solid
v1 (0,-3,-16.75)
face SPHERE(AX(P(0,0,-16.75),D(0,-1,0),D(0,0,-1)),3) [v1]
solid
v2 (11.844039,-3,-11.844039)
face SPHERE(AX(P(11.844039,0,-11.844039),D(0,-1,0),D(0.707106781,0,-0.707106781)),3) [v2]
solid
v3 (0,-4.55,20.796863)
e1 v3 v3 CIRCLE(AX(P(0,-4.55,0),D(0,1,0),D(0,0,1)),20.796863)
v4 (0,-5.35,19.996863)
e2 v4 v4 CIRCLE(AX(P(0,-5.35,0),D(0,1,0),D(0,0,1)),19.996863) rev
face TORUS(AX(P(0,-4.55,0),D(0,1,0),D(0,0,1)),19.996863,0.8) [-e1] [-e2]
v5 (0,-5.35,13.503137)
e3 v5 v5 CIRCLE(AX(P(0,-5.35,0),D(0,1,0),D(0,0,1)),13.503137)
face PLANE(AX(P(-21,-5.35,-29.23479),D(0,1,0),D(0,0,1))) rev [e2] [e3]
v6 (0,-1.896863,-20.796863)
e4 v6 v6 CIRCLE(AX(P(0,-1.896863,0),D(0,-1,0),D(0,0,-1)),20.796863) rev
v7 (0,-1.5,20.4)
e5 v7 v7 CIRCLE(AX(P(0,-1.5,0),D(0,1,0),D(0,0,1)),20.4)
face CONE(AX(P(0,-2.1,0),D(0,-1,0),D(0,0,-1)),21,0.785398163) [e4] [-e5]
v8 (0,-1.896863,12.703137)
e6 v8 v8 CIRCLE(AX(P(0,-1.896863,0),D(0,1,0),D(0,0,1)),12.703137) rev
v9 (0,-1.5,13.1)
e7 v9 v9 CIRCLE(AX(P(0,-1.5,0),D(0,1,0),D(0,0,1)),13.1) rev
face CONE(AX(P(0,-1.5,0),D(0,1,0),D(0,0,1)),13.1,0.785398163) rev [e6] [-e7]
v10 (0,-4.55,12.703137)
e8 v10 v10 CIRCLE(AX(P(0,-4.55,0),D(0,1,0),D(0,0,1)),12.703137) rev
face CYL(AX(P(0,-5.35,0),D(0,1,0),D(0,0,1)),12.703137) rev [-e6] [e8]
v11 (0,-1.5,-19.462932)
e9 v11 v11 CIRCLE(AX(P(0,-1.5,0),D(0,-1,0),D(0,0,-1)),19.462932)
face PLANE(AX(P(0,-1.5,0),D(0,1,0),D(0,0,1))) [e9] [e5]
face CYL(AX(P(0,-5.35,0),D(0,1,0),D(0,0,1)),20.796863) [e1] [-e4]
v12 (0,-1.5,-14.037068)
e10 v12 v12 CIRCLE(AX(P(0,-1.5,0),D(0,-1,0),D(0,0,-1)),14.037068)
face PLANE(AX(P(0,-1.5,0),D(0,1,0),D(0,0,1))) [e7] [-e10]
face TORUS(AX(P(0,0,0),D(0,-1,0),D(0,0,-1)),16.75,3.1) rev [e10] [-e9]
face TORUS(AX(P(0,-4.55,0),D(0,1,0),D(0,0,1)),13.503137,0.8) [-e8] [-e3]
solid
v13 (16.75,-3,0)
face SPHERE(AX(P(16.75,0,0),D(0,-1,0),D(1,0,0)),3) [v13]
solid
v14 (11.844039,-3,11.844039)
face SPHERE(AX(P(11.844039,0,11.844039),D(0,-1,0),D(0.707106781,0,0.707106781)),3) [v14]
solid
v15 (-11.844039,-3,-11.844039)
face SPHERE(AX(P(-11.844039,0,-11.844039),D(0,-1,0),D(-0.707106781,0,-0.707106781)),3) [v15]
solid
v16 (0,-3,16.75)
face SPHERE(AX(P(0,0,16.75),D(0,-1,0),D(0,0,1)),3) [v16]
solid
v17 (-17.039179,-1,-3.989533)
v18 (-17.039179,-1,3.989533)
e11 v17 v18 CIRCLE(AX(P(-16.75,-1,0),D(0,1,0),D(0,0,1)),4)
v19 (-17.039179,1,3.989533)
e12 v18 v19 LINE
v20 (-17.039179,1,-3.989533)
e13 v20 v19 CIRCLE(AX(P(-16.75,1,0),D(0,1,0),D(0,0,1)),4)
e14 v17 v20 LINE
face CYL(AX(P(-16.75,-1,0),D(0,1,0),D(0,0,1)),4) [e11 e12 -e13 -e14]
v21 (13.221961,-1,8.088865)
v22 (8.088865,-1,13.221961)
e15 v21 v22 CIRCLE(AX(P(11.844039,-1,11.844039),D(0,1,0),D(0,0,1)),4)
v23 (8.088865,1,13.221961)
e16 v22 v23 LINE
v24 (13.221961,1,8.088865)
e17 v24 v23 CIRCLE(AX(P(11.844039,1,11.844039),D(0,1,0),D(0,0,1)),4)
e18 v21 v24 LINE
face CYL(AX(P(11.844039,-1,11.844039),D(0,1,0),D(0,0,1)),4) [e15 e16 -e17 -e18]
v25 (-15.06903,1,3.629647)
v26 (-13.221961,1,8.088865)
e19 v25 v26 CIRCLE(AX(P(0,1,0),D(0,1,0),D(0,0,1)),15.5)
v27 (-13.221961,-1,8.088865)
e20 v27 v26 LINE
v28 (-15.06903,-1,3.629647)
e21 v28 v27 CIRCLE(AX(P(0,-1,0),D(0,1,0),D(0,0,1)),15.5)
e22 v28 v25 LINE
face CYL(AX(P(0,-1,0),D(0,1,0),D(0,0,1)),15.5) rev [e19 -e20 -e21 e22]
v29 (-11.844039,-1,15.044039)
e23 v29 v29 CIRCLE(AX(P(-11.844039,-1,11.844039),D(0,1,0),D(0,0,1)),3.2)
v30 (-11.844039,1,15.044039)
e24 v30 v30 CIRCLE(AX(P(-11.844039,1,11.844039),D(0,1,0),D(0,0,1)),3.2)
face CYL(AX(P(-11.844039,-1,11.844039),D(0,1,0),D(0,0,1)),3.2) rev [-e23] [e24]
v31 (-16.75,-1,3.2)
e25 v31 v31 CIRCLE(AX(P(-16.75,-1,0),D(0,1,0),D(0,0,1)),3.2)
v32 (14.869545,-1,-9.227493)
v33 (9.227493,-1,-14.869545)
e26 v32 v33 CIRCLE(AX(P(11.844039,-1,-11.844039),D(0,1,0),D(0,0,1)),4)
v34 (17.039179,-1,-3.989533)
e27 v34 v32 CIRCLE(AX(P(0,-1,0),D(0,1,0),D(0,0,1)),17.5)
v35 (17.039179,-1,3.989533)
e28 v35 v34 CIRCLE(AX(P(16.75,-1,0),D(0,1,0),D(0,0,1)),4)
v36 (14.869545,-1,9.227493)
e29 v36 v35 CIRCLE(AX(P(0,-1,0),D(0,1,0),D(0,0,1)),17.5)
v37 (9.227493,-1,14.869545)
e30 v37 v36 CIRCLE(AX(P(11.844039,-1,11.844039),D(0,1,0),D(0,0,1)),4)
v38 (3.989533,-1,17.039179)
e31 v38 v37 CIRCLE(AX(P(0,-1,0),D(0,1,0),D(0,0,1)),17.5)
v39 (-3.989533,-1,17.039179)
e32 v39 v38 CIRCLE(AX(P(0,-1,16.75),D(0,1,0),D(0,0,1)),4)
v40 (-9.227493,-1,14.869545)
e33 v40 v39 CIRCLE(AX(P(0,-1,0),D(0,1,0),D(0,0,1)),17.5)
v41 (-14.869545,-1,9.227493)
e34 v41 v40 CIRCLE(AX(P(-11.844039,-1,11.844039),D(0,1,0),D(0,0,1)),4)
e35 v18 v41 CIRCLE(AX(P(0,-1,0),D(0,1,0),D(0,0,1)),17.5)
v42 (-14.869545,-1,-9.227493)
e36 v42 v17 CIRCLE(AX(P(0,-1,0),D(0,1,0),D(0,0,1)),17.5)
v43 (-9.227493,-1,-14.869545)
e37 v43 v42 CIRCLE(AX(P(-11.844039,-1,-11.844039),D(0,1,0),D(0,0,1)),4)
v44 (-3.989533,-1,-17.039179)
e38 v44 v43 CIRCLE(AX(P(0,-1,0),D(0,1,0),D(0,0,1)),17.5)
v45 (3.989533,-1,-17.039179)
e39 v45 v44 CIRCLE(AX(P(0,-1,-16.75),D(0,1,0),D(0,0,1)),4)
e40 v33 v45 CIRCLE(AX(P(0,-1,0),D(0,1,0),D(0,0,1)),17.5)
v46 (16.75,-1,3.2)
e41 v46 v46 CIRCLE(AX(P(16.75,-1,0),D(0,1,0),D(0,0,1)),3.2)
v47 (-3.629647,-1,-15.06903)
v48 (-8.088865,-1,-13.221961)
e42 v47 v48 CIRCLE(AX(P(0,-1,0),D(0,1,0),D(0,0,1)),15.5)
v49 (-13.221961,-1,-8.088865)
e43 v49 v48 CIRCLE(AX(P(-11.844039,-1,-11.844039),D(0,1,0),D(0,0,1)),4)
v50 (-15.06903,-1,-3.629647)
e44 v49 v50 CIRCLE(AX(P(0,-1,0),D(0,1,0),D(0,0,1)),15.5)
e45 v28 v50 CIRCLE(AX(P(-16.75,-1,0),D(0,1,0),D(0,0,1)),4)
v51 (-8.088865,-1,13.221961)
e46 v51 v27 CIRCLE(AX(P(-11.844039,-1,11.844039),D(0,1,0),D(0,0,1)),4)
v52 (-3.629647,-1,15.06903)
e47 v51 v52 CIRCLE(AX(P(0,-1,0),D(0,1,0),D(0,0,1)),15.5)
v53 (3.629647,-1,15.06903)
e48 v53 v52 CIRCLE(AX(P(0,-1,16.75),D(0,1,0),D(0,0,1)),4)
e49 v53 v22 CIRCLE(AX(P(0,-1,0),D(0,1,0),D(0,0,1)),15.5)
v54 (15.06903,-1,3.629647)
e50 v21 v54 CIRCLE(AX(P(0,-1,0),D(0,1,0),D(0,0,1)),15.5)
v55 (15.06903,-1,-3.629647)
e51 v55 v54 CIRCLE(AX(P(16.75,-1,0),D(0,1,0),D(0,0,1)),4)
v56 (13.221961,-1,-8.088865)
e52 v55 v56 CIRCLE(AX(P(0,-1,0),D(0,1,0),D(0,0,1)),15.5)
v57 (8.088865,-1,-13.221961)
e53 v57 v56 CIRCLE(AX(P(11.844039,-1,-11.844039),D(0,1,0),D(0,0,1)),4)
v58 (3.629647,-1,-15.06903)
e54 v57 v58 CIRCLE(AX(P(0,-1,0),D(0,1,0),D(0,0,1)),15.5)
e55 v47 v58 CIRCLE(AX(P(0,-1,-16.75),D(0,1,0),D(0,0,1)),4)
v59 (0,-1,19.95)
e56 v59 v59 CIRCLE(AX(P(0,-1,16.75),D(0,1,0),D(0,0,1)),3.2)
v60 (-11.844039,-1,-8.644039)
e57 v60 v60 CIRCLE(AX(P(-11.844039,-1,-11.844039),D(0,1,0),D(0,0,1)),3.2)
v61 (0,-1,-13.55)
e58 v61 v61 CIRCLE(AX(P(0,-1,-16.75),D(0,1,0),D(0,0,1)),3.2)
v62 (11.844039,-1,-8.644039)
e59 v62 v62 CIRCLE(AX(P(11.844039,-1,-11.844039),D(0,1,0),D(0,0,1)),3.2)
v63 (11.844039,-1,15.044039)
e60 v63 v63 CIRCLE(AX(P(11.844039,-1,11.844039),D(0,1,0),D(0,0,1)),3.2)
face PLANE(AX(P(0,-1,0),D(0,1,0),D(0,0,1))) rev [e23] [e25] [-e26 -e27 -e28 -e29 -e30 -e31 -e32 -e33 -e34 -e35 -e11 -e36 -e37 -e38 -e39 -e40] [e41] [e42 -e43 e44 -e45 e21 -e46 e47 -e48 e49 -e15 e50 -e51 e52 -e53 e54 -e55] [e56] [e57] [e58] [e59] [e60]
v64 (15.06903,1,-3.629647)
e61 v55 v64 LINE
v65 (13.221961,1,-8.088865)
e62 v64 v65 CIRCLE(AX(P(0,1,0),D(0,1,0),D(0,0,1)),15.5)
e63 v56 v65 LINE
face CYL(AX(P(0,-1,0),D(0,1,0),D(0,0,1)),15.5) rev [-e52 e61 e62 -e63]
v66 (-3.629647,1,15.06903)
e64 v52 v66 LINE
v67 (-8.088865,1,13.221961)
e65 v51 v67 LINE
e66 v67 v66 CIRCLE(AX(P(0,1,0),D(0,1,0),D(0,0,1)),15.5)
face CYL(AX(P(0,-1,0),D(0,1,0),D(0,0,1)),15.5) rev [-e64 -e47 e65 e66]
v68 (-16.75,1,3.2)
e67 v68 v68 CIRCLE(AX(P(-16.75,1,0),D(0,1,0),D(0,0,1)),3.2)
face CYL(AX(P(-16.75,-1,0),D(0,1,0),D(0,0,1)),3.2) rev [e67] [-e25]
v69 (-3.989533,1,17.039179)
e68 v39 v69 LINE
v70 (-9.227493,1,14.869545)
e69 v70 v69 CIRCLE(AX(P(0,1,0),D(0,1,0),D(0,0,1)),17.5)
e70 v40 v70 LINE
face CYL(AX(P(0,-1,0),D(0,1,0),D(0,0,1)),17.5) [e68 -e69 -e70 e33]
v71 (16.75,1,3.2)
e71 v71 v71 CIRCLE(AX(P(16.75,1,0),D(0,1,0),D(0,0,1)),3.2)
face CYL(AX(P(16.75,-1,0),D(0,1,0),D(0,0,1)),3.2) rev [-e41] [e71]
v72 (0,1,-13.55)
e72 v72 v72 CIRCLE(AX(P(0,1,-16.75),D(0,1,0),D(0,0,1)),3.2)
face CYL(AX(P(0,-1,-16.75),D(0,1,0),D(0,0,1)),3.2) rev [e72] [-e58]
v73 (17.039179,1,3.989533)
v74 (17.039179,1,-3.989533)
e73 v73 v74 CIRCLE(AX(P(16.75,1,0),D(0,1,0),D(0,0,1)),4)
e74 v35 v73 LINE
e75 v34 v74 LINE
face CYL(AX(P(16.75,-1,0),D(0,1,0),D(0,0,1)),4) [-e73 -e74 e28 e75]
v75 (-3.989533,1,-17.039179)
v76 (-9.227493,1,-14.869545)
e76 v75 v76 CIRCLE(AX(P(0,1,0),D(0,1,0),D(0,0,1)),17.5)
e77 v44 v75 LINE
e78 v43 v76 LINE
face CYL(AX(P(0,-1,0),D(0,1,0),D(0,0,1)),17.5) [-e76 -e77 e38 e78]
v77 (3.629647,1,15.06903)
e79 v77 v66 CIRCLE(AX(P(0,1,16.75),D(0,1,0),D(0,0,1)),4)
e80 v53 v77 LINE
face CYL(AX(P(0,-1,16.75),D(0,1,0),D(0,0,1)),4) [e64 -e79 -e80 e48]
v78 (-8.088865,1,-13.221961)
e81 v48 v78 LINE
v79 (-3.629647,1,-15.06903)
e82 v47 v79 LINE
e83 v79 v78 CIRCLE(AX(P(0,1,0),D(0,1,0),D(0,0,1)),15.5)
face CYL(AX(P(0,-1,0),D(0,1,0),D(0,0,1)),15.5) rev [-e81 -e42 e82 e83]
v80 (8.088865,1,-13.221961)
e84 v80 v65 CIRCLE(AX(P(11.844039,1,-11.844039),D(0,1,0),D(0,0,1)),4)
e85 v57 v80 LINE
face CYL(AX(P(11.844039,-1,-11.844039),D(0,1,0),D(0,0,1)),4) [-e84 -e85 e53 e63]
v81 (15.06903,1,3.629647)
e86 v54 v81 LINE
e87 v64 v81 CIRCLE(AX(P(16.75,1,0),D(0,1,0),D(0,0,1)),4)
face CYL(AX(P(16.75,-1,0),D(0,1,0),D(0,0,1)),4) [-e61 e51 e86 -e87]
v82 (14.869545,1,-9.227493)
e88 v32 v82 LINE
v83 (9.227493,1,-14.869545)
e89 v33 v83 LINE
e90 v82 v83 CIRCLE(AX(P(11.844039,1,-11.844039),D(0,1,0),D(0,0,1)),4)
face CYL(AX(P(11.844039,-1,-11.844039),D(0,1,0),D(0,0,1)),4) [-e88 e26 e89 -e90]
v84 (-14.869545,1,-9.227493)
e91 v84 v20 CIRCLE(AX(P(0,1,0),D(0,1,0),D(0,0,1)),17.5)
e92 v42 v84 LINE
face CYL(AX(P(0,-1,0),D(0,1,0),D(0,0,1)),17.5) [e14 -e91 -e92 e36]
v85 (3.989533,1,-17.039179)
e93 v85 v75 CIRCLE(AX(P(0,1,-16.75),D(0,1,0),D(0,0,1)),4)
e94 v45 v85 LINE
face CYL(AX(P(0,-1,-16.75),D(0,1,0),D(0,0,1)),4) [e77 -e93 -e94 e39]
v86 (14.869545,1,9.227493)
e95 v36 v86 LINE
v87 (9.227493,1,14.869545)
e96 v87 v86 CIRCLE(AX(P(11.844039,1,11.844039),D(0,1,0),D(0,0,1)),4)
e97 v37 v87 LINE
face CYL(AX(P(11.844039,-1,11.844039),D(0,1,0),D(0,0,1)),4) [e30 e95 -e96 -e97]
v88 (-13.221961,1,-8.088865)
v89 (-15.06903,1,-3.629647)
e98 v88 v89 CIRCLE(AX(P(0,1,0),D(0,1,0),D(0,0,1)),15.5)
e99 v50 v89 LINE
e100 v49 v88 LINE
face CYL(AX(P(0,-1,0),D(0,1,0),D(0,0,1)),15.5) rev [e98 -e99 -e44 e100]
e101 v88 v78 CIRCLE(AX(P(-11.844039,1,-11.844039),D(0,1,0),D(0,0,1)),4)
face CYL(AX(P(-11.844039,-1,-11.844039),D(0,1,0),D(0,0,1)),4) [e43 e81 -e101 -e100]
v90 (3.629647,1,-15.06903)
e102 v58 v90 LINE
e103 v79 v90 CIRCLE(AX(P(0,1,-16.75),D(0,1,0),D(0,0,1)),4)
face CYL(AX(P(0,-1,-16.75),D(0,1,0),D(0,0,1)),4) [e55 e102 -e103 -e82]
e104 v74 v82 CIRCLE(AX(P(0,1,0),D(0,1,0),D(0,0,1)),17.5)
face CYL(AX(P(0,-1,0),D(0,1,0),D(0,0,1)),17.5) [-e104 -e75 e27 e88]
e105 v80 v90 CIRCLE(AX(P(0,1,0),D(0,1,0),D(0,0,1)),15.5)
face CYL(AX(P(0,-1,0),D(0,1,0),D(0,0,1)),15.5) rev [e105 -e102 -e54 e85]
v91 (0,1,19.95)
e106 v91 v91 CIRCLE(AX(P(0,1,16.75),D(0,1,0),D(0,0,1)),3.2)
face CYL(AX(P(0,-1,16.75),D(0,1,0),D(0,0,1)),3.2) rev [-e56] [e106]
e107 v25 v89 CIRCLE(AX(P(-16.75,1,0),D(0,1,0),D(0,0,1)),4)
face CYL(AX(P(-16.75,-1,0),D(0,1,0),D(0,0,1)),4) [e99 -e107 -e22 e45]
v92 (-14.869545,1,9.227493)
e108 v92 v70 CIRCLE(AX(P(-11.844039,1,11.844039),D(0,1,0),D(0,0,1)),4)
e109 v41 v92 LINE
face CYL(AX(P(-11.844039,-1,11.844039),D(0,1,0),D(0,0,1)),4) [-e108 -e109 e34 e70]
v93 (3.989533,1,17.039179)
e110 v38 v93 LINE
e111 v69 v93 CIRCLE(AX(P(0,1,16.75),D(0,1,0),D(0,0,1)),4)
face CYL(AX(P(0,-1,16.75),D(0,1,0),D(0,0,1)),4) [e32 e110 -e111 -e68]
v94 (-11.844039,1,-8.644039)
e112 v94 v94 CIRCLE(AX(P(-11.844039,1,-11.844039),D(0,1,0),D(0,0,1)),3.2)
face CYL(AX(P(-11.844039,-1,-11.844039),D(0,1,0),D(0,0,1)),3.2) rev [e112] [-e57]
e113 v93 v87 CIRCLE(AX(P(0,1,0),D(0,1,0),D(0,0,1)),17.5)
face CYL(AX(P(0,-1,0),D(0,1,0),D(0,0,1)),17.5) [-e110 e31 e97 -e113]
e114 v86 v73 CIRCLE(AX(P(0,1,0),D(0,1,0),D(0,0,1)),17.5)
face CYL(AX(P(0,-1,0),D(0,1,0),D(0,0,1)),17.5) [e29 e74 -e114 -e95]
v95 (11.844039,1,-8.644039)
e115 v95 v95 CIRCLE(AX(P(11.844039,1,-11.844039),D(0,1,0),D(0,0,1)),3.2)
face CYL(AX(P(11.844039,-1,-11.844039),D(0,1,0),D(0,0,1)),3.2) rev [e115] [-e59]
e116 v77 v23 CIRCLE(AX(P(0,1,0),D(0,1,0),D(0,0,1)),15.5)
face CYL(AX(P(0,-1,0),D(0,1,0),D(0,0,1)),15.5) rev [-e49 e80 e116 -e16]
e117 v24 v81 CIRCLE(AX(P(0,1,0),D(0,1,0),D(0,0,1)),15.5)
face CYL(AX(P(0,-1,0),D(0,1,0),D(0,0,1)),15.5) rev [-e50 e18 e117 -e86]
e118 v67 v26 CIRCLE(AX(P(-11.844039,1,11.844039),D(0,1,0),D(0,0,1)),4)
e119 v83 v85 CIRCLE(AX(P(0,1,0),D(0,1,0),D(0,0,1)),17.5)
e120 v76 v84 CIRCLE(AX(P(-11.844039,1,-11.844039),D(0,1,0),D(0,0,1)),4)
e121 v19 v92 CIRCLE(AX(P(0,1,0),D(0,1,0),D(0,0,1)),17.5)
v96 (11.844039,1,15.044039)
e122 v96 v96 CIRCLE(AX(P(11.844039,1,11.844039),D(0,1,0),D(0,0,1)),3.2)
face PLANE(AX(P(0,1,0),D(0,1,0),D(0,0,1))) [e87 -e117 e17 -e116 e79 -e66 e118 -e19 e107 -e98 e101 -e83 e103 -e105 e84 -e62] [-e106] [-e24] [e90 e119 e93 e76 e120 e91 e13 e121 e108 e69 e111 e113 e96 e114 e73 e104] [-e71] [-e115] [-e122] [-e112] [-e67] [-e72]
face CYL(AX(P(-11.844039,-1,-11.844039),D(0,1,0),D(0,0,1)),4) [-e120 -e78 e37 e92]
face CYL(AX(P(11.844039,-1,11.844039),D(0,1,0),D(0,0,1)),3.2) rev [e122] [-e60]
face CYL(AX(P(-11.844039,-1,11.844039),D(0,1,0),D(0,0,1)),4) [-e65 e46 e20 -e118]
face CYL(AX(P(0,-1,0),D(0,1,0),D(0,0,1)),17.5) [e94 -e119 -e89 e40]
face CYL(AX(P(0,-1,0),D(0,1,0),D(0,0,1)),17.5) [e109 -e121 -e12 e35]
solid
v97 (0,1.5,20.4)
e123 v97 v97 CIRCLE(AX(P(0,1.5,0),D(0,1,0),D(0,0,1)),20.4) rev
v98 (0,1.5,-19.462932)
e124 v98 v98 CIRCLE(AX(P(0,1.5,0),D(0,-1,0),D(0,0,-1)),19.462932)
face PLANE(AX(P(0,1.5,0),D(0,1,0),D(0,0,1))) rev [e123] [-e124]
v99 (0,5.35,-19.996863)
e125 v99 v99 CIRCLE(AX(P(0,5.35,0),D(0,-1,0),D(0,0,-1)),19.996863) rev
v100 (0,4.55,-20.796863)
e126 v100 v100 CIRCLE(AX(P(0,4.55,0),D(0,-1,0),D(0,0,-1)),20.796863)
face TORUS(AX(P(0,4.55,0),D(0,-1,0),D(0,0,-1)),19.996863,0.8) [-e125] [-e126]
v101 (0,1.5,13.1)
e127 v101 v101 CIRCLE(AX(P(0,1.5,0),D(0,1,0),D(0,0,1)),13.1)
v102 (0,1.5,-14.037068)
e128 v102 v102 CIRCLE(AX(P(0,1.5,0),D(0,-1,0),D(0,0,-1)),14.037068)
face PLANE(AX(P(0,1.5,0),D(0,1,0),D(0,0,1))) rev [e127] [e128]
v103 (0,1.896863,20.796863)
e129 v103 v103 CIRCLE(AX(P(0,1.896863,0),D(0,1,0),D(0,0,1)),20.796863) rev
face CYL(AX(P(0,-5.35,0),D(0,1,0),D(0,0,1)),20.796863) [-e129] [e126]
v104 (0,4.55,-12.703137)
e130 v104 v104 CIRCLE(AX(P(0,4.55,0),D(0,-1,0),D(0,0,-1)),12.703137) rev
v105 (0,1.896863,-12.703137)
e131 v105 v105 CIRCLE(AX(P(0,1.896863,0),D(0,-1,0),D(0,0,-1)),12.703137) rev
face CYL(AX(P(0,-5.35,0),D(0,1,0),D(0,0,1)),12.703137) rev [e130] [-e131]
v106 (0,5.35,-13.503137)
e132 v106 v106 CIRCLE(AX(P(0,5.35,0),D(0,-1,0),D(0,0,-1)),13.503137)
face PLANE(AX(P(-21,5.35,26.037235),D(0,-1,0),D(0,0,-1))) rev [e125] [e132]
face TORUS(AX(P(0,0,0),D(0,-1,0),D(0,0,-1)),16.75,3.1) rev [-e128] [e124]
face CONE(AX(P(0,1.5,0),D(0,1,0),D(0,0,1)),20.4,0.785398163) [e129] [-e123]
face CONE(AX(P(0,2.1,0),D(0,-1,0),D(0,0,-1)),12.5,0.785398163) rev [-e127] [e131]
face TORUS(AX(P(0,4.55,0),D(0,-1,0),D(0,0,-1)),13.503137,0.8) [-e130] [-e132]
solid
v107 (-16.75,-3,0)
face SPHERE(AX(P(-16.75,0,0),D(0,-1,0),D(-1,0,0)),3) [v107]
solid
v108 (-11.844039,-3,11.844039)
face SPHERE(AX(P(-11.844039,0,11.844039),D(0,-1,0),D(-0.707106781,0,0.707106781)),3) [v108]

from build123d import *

# Parameters (mm, degrees)
CIRPATTERN2_COUNT       = 8
FILLET1_R               = 0.6
CHAMFER1_SIZE           = 0.6
FILLET2_R               = 0.6
CHAMFER2_SIZE           = 0.6
BOSS_EXTRUDE1_START     = -1
BOSS_EXTRUDE1_OUTLINE_R = 3.2
BOSS_EXTRUDE1_DEPTH     = 2
CUT_EXTRUDE1_DEPTH      = 31.20347676
CUT_EXTRUDE1_DEPTH_BACK = 31.20347676
SKETCH5_W               = 57.274889508
SKETCH5_H               = 8.854768194
SKETCH5_W_2             = 54.393576048
SKETCH5_H_2             = 6.043730672
SKETCH6_R               = 25.060722521
SKETCH6_R_2             = 20.796862697
SKETCH6_R_3             = 12.703137303
CUT_EXTRUDE2_DEPTH      = 32.56722991
FILLET3_R               = 0.8
FILLET4_R               = 0.8
FILLET5_R               = 0.8
FILLET6_R               = 0.8


# Read off the part's stored shape, not the designer's step: Boss-Extrude1
with BuildPart() as part:
    # Sketch1 → Revolve4 (revolve)
    with BuildSketch(Plane(origin=(0, 0, 0), x_dir=(0, 0, -1), z_dir=(1, 0, 0))):
        with BuildLine():
            Line((-16.75, 3), (-16.75, -3))
            ThreePointArc((-16.75, -3), (-19.75, 0), (-16.75, 3))
        make_face()
    revolve(axis=Axis((0, 0, 16.75), (0, 1, 0)))


with BuildPart() as body_2:
    # Sketch3 → Revolve5 (revolve)
    with BuildSketch(Plane(origin=(0, 0, 0), x_dir=(0, 0, -1), z_dir=(1, 0, 0)), mode=Mode.PRIVATE) as revolve5_sk:
        with BuildLine():
            Line((-12.5, 5.5), (-21, 5.5))
            Line((-21, 5.5), (-21, 1.5))
            Line((-21, 1.5), (-19.462931993, 1.5))
            ThreePointArc((-19.462931993, 1.5), (-16.75, 3.1), (-14.037068007, 1.5))
            Line((-14.037068007, 1.5), (-12.5, 1.5))
            Line((-12.5, 1.5), (-12.5, 5.5))
        make_face()
        with BuildLine():
            ThreePointArc((-14.037068007, -1.5), (-16.75, -3.1), (-19.462931993, -1.5))
            Line((-19.462931993, -1.5), (-21, -1.5))
            Line((-21, -1.5), (-21, -5.5))
            Line((-21, -5.5), (-12.5, -5.5))
            Line((-12.5, -5.5), (-12.5, -1.5))
            Line((-12.5, -1.5), (-14.037068007, -1.5))
        make_face()
    revolve(revolve5_sk.sketch.rotate(Axis((0, 0, 0), (0, 1, 0)), 180), axis=Axis((0, 0, 0), (0, 1, 0)))

    # Fillet1
    fillet1_edges = [body_2.edges().sort_by_distance(p)[0] for p in [
        (0, 5.5, 21),
        (0, 5.5, 12.5),
    ]]
    fillet(fillet1_edges, radius=FILLET1_R)

    # Chamfer1
    chamfer1_edges = [body_2.edges().sort_by_distance(p)[0] for p in [
        (0, -1.5, 12.5),
        (0, -1.5, 21),
    ]]
    chamfer(chamfer1_edges, length=CHAMFER1_SIZE)

    # Fillet2
    fillet2_edges = [body_2.edges().sort_by_distance(p)[0] for p in [
        (0, -5.5, 12.5),
        (0, -5.5, 21),
    ]]
    fillet(fillet2_edges, radius=FILLET2_R)

    # Chamfer2
    chamfer2_edges = [body_2.edges().sort_by_distance(p)[0] for p in [
        (0, 1.5, 21),
        (0, 1.5, 12.5),
    ]]
    chamfer(chamfer2_edges, length=CHAMFER2_SIZE)

    # Sketch5 → Cut-Extrude1 (cut, two sides: drawn at the far end of the back side and taken through both)
    with BuildSketch(Plane(origin=(0, 0, 0), x_dir=(0, 0, -1), z_dir=(1, 0, 0)).offset(-CUT_EXTRUDE1_DEPTH_BACK)):
        with Locations((2.600209708, 9.777384097)):
            Rectangle(SKETCH5_W, SKETCH5_H)
        with Locations((2.038002203, -8.371865336)):
            Rectangle(SKETCH5_W_2, SKETCH5_H_2)
    extrude(amount=CUT_EXTRUDE1_DEPTH + CUT_EXTRUDE1_DEPTH_BACK, mode=Mode.SUBTRACT)

    # Sketch6 → Cut-Extrude2 (cut, through all)
    # profile 1 of 2: a face of its own
    with BuildSketch(Plane(origin=(0, 5.35, 0), x_dir=(1, 0, 0), z_dir=(0, 1, 0))):
        Circle(SKETCH6_R)
        with Locations(Location((0, 0, 0), (0, 0, 270))):
            Circle(SKETCH6_R_2, mode=Mode.SUBTRACT)
    # profile 2 of 2: a face of its own
    with BuildSketch(Plane(origin=(0, 5.35, 0), x_dir=(1, 0, 0), z_dir=(0, 1, 0))):
        with Locations(Location((0, 0, 0), (0, 0, 270))):
            Circle(SKETCH6_R_3)
    extrude(amount=-CUT_EXTRUDE2_DEPTH, mode=Mode.SUBTRACT)

    # Fillet3
    fillet3_edges = [body_2.edges().sort_by_distance(p)[0] for p in [
        (0, 5.35, -20.796862697),
    ]]
    fillet(fillet3_edges, radius=FILLET3_R)

    # Fillet4
    fillet4_edges = [body_2.edges().sort_by_distance(p)[0] for p in [
        (0, -5.35, -20.796862697),
    ]]
    fillet(fillet4_edges, radius=FILLET4_R)

    # Fillet5
    fillet5_edges = [body_2.edges().sort_by_distance(p)[0] for p in [
        (0, 5.35, -12.703137303),
    ]]
    fillet(fillet5_edges, radius=FILLET5_R)

    # Fillet6
    fillet6_edges = [body_2.edges().sort_by_distance(p)[0] for p in [
        (0, -5.35, -12.703137303),
    ]]
    fillet(fillet6_edges, radius=FILLET6_R)


with BuildPart() as cirpattern2_1:
    # CirPattern2: pattern copy
    add(part.part.rotate(Axis((0, 0, 0), (0, 1, 0)), 1 * 360 / CIRPATTERN2_COUNT))


with BuildPart() as cirpattern2_2:
    # CirPattern2: pattern copy
    add(part.part.rotate(Axis((0, 0, 0), (0, 1, 0)), 2 * 360 / CIRPATTERN2_COUNT))


with BuildPart() as cirpattern2_3:
    # CirPattern2: pattern copy
    add(part.part.rotate(Axis((0, 0, 0), (0, 1, 0)), 3 * 360 / CIRPATTERN2_COUNT))


with BuildPart() as cirpattern2_4:
    # CirPattern2: pattern copy
    add(part.part.rotate(Axis((0, 0, 0), (0, 1, 0)), 4 * 360 / CIRPATTERN2_COUNT))


with BuildPart() as cirpattern2_5:
    # CirPattern2: pattern copy
    add(part.part.rotate(Axis((0, 0, 0), (0, 1, 0)), 5 * 360 / CIRPATTERN2_COUNT))


with BuildPart() as cirpattern2_6:
    # CirPattern2: pattern copy
    add(part.part.rotate(Axis((0, 0, 0), (0, 1, 0)), 6 * 360 / CIRPATTERN2_COUNT))


with BuildPart() as cirpattern2_7:
    # CirPattern2: pattern copy
    add(part.part.rotate(Axis((0, 0, 0), (0, 1, 0)), 7 * 360 / CIRPATTERN2_COUNT))


with BuildPart() as body_10:
    # Boss-Extrude1 outline → Boss-Extrude1 (new body)
    with BuildSketch(Plane(origin=(0, 0, 0), x_dir=(1, 0, 0), z_dir=(0, 1, 0)).offset(BOSS_EXTRUDE1_START)):
        with BuildLine():
            ThreePointArc((9.227493085, 14.869545096), (6.696960066, 16.167891819), (3.989533237, 17.039179104))
            ThreePointArc((3.989533237, 17.039179104), (0, 20.75), (-3.989533237, 17.039179104))
            ThreePointArc((-3.989533237, 17.039179104), (-6.696960066, 16.167891819), (-9.227493085, 14.869545096))
            ThreePointArc((-9.227493085, 14.869545096), (-14.67246571, 14.67246571), (-14.869545096, 9.227493085))
            ThreePointArc((-14.869545096, 9.227493085), (-16.167891819, 6.696960066), (-17.039179104, 3.989533237))
            ThreePointArc((-17.039179104, 3.989533237), (-20.75, 0), (-17.039179104, -3.989533237))
            ThreePointArc((-17.039179104, -3.989533237), (-16.167891819, -6.696960066), (-14.869545096, -9.227493085))
            ThreePointArc((-14.869545096, -9.227493085), (-14.67246571, -14.67246571), (-9.227493085, -14.869545096))
            ThreePointArc((-9.227493085, -14.869545096), (-6.696960066, -16.167891819), (-3.989533237, -17.039179104))
            ThreePointArc((-3.989533237, -17.039179104), (0, -20.75), (3.989533237, -17.039179104))
            ThreePointArc((3.989533237, -17.039179104), (6.696960066, -16.167891819), (9.227493085, -14.869545096))
            ThreePointArc((9.227493085, -14.869545096), (14.67246571, -14.67246571), (14.869545096, -9.227493085))
            ThreePointArc((14.869545096, -9.227493085), (16.167891819, -6.696960066), (17.039179104, -3.989533237))
            ThreePointArc((17.039179104, -3.989533237), (20.75, 0), (17.039179104, 3.989533237))
            ThreePointArc((17.039179104, 3.989533237), (16.167891819, 6.696960066), (14.869545096, 9.227493085))
            ThreePointArc((14.869545096, 9.227493085), (14.67246571, 14.67246571), (9.227493085, 14.869545096))
        make_face()
        with Locations((-11.844038585, -11.844038585)):
            Circle(BOSS_EXTRUDE1_OUTLINE_R, mode=Mode.SUBTRACT)
        with Locations((0, -16.75)):
            Circle(BOSS_EXTRUDE1_OUTLINE_R, mode=Mode.SUBTRACT)
        with Locations((11.844038585, -11.844038585)):
            Circle(BOSS_EXTRUDE1_OUTLINE_R, mode=Mode.SUBTRACT)
        with Locations((-16.75, 0)):
            Circle(BOSS_EXTRUDE1_OUTLINE_R, mode=Mode.SUBTRACT)
        with Locations((-11.844038585, 11.844038585)):
            Circle(BOSS_EXTRUDE1_OUTLINE_R, mode=Mode.SUBTRACT)
        with BuildLine():
            ThreePointArc((-8.08886499, 13.221961396), (-5.931593202, 14.320132754), (-3.629647277, 15.069029851))
            ThreePointArc((-3.629647277, 15.069029851), (0, 12.75), (3.629647277, 15.069029851))
            ThreePointArc((3.629647277, 15.069029851), (5.931593202, 14.320132754), (8.08886499, 13.221961396))
            ThreePointArc((8.08886499, 13.221961396), (9.01561146, 9.01561146), (13.221961396, 8.08886499))
            ThreePointArc((13.221961396, 8.08886499), (14.320132754, 5.931593202), (15.069029851, 3.629647277))
            ThreePointArc((15.069029851, 3.629647277), (12.75, 0), (15.069029851, -3.629647277))
            ThreePointArc((15.069029851, -3.629647277), (14.320132754, -5.931593202), (13.221961396, -8.08886499))
            ThreePointArc((13.221961396, -8.08886499), (9.01561146, -9.01561146), (8.08886499, -13.221961396))
            ThreePointArc((8.08886499, -13.221961396), (5.931593202, -14.320132754), (3.629647277, -15.069029851))
            ThreePointArc((3.629647277, -15.069029851), (0, -12.75), (-3.629647277, -15.069029851))
            ThreePointArc((-3.629647277, -15.069029851), (-5.931593202, -14.320132754), (-8.08886499, -13.221961396))
            ThreePointArc((-8.08886499, -13.221961396), (-9.01561146, -9.01561146), (-13.221961396, -8.08886499))
            ThreePointArc((-13.221961396, -8.08886499), (-14.320132754, -5.931593202), (-15.069029851, -3.629647277))
            ThreePointArc((-15.069029851, -3.629647277), (-12.75, 0), (-15.069029851, 3.629647277))
            ThreePointArc((-15.069029851, 3.629647277), (-14.320132754, 5.931593202), (-13.221961396, 8.08886499))
            ThreePointArc((-13.221961396, 8.08886499), (-9.01561146, 9.01561146), (-8.08886499, 13.221961396))
        make_face(mode=Mode.SUBTRACT)
        with Locations((16.75, 0)):
            Circle(BOSS_EXTRUDE1_OUTLINE_R, mode=Mode.SUBTRACT)
        with Locations((0, 16.75)):
            Circle(BOSS_EXTRUDE1_OUTLINE_R, mode=Mode.SUBTRACT)
        with Locations((11.844038585, 11.844038585)):
            Circle(BOSS_EXTRUDE1_OUTLINE_R, mode=Mode.SUBTRACT)
    extrude(amount=BOSS_EXTRUDE1_DEPTH)


solid = Compound([part.part, body_2.part, cirpattern2_1.part, cirpattern2_2.part, cirpattern2_3.part, cirpattern2_4.part, cirpattern2_5.part, cirpattern2_6.part, cirpattern2_7.part, body_10.part])
